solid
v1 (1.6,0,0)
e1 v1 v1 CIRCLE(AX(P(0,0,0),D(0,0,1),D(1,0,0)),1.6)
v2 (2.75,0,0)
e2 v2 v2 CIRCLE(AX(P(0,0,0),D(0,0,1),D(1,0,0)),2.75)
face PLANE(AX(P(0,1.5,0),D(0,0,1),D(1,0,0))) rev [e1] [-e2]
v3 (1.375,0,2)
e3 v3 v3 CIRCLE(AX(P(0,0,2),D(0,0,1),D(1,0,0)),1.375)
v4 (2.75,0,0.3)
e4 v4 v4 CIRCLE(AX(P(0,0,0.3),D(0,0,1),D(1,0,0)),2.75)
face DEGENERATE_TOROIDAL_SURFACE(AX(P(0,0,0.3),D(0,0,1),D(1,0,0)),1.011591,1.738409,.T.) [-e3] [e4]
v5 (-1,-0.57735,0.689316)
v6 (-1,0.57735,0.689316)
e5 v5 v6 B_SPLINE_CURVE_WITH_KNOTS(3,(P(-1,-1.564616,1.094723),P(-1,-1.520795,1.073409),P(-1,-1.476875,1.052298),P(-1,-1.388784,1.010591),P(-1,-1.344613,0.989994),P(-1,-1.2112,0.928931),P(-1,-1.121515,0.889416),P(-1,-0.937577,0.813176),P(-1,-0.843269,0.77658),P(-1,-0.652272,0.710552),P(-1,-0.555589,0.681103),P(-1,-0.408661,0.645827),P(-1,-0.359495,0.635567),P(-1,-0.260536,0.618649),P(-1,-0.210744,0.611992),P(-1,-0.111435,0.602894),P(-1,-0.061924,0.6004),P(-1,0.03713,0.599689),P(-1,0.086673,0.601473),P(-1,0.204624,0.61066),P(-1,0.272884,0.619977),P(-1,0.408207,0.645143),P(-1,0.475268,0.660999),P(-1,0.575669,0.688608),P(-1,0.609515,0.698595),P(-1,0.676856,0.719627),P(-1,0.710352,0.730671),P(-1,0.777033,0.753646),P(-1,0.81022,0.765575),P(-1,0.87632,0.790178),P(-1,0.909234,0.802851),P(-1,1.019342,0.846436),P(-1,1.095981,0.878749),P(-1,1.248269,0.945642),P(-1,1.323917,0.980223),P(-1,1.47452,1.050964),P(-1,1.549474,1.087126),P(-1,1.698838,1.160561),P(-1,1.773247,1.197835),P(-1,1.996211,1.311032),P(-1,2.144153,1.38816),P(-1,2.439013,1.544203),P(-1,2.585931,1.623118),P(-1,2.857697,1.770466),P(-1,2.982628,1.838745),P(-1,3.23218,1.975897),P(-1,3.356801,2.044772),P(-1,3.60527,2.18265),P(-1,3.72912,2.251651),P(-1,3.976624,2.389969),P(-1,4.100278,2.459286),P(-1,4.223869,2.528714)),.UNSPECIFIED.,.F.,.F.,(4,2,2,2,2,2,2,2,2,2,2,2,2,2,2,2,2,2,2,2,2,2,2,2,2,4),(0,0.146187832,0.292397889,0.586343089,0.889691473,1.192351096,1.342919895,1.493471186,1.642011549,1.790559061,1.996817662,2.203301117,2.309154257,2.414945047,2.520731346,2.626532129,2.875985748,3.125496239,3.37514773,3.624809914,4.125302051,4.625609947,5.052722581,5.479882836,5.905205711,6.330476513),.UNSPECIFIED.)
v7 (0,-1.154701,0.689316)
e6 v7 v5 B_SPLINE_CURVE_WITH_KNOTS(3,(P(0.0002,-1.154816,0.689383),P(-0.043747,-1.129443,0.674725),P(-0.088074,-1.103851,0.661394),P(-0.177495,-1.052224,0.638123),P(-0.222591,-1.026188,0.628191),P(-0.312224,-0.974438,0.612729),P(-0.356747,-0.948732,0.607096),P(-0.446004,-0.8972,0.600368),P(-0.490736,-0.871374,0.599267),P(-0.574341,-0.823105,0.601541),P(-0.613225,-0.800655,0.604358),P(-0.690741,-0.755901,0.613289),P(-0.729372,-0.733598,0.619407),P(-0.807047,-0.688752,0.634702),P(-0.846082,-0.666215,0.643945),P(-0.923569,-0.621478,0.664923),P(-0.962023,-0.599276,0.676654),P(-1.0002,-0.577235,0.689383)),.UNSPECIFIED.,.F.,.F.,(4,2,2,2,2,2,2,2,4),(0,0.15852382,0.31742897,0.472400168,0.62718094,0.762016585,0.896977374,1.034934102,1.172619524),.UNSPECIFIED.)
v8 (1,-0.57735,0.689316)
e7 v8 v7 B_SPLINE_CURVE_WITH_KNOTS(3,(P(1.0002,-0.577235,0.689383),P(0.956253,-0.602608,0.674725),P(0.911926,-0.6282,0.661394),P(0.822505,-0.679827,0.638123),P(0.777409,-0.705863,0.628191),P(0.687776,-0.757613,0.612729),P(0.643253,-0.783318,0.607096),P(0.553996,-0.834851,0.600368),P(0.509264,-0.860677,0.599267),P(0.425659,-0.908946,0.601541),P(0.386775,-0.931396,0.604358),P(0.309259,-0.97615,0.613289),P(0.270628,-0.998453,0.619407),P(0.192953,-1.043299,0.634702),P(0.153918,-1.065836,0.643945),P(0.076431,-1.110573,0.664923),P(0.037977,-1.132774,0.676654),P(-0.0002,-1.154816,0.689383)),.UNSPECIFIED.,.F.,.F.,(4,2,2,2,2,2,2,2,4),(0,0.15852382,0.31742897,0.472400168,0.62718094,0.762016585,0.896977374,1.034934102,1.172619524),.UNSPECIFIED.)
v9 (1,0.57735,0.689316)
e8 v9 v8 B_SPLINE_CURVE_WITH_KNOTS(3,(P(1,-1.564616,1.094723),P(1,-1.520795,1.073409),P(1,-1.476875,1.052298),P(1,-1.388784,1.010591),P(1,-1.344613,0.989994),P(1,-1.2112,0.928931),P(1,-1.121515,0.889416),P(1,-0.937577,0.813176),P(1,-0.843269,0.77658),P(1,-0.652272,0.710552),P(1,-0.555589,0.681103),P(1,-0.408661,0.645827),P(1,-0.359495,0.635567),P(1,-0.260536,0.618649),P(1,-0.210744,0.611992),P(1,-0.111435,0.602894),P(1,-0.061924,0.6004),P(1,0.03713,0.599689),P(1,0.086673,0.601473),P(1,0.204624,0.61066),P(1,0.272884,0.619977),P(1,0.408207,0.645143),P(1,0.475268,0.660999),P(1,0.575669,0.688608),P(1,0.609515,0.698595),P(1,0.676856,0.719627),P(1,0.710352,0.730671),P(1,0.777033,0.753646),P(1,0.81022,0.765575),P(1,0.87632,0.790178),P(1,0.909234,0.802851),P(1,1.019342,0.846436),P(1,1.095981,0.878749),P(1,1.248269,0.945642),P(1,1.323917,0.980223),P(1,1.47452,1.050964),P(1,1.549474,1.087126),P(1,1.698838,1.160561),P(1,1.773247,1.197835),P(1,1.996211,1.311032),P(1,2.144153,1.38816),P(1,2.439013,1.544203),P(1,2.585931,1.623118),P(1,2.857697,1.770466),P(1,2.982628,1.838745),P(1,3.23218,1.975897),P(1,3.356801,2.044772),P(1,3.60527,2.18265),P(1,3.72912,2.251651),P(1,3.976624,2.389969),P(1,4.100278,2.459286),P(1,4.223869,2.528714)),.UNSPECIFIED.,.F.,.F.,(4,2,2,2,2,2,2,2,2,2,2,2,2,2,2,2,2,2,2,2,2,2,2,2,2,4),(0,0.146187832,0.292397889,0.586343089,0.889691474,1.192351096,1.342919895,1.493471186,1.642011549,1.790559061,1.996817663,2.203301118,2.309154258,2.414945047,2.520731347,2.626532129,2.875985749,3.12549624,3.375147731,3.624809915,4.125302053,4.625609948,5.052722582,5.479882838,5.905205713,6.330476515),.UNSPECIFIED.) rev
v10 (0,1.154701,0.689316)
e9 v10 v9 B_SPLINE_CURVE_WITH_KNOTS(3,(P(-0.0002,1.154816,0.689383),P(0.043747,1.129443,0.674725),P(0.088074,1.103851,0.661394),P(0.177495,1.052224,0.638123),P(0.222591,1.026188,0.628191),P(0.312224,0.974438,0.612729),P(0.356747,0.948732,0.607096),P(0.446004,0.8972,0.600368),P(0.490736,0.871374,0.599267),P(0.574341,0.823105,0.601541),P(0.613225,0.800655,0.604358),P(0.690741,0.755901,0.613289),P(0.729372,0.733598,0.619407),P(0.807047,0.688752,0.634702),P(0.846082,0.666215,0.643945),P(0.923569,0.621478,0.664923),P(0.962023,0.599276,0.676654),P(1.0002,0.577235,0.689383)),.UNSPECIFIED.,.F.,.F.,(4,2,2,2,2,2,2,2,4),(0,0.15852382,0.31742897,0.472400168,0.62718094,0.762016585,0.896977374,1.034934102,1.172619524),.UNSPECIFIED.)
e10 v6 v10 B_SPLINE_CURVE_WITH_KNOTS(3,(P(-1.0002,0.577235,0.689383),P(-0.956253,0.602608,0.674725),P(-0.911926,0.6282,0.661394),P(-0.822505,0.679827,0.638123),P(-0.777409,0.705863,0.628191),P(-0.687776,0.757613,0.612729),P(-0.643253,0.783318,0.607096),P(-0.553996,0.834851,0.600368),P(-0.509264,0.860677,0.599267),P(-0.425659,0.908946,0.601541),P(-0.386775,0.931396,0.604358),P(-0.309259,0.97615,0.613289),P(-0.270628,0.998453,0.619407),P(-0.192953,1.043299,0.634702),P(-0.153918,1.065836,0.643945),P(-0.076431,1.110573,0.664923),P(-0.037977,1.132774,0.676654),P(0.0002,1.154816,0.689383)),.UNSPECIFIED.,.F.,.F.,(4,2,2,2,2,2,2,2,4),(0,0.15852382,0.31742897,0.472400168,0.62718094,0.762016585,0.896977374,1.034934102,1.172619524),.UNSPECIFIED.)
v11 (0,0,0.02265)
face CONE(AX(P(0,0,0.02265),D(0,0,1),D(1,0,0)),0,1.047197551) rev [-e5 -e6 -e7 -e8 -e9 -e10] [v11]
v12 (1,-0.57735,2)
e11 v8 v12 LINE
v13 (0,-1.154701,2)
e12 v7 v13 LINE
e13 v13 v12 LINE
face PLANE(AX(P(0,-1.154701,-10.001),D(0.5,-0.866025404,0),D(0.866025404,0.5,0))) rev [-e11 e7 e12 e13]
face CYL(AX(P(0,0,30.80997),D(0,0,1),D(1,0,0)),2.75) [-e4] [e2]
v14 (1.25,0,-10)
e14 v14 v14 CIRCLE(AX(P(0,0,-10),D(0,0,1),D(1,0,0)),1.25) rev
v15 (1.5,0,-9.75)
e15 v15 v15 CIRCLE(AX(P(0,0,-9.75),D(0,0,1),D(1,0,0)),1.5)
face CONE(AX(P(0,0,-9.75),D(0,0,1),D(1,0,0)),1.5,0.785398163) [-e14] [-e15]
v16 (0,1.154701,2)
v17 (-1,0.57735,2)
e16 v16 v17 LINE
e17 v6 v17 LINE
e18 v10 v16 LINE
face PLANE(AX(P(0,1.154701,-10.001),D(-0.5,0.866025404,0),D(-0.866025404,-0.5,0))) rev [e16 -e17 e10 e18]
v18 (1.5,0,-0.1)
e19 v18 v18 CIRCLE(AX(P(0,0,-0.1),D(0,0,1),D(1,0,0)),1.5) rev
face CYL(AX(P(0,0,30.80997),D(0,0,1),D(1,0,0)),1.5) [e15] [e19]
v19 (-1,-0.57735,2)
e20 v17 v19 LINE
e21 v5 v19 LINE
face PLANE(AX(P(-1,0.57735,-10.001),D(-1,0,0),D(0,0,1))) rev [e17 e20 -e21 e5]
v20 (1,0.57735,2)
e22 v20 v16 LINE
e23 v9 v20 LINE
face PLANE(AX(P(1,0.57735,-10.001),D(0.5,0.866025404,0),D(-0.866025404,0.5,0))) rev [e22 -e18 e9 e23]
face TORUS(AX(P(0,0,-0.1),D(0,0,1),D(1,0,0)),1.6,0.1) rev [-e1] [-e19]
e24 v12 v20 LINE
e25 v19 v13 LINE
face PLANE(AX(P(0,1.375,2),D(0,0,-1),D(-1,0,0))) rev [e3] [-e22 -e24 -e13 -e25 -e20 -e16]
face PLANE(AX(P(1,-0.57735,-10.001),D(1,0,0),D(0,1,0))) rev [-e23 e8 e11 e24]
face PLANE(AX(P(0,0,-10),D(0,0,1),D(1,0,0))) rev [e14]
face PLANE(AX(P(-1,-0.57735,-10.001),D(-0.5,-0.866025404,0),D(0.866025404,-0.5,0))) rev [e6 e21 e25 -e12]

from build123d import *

# Parameters (mm, degrees)
CHAMFER1_SIZE      = 0.25
CUT_EXTRUDE1_START = -1.4000001
CUT_EXTRUDE1_DEPTH = 1.4000001
FILLET1_R          = 0.1


with BuildPart() as part:
    # Sketch1 → Revolve1 (revolve)
    with BuildSketch(Plane(origin=(0, 0, 0), x_dir=(0, 0, -1), z_dir=(1, 0, 0)), mode=Mode.PRIVATE) as revolve1_sk:
        with BuildLine():
            Line((10, 0), (10, 1.5))
            Line((10, 1.5), (0, 1.5))
            Line((0, 1.5), (0, 2.75))
            Line((0, 2.75), (-0.3, 2.75))
            ThreePointArc((-0.3, 2.75), (-1.39323202, 2.363223225), (-2, 1.375))
            Line((-2, 1.375), (-2, 0))
            Line((-2, 0), (10, 0))
        make_face()
    revolve(revolve1_sk.sketch.rotate(Axis((0, 0, 30.809969789), (0, 0, -1)), 90), axis=Axis((0, 0, 30.809969789), (0, 0, -1)))

    # Chamfer1
    chamfer1_edges = [part.edges().sort_by_distance(p)[0] for p in [
        (-1.5, 0, -10),
    ]]
    chamfer(chamfer1_edges, length=CHAMFER1_SIZE)

    # Sketch2 → Cut-Revolve1 (revolve, cut)
    with BuildSketch(Plane(origin=(0, 0, 0), x_dir=(0, 0, -1), z_dir=(1, 0, 0)), mode=Mode.PRIVATE) as cut_revolve1_sk:
        Polygon((-2, 0), (-2, 1), (-0.6, 1), (-0.022649731, 0), align=None)
    revolve(cut_revolve1_sk.sketch.rotate(Axis((0, 0, 2.452500839), (0, 0, -1)), 90), axis=Axis((0, 0, 2.452500839), (0, 0, -1)), mode=Mode.SUBTRACT)

    # Cut-Extrude1: read off the stored shape, not the designer's step
    # Cut-Extrude1 outline → Cut-Extrude1 (cut)
    with BuildSketch(Plane.XY.offset(2).offset(CUT_EXTRUDE1_START)):
        with BuildLine():
            Line((1, 0), (1, 0.577350269))
            Line((1, 0.577350269), (0.500019222, 0.866014306))
            ThreePointArc((0.500019222, 0.866014306), (0.866030953, 0.499990389), (1, 0))
        make_face()
        with BuildLine():
            ThreePointArc((-0.500019222, 0.866014306), (0, 1), (0.500019222, 0.866014306))
            Line((0.500019222, 0.866014306), (0, 1.154700538))
            Line((0, 1.154700538), (-0.500019222, 0.866014306))
        make_face()
        with BuildLine():
            Line((1, -0.577350269), (1, 0))
            ThreePointArc((1, 0), (0.866030953, -0.499990389), (0.500019222, -0.866014306))
            Line((0.500019222, -0.866014306), (1, -0.577350269))
        make_face()
        with BuildLine():
            ThreePointArc((-1, 0), (-0.866030953, 0.499990389), (-0.500019222, 0.866014306))
            Line((-0.500019222, 0.866014306), (-1, 0.577350269))
            Line((-1, 0.577350269), (-1, 0))
        make_face()
        with BuildLine():
            Line((0, -1.154700538), (0.500019222, -0.866014306))
            ThreePointArc((0.500019222, -0.866014306), (0, -1), (-0.500019222, -0.866014306))
            Line((-0.500019222, -0.866014306), (0, -1.154700538))
        make_face()
        with BuildLine():
            ThreePointArc((-0.500019222, -0.866014306), (-0.866030953, -0.499990389), (-1, 0))
            Line((-1, 0), (-1, -0.577350269))
            Line((-1, -0.577350269), (-0.500019222, -0.866014306))
        make_face()
    extrude(amount=CUT_EXTRUDE1_DEPTH, mode=Mode.SUBTRACT)

    # Cut-Extrude1 2 outline → Cut-Extrude1 2 (revolve)
    with BuildSketch(Plane.XZ):
        Polygon((1.154700598, 0.689316432), (0.999999957, 0.599999975), (1.154700538, 0.5999999), align=None)
    revolve(axis=Axis((0, 0, 0), (0, 0, 1)))

    # Fillet1
    fillet1_edges = [part.edges().sort_by_distance(p)[0] for p in [
        (-1.5, 0, 0),
    ]]
    fillet(fillet1_edges, radius=FILLET1_R)


solid = part.part
